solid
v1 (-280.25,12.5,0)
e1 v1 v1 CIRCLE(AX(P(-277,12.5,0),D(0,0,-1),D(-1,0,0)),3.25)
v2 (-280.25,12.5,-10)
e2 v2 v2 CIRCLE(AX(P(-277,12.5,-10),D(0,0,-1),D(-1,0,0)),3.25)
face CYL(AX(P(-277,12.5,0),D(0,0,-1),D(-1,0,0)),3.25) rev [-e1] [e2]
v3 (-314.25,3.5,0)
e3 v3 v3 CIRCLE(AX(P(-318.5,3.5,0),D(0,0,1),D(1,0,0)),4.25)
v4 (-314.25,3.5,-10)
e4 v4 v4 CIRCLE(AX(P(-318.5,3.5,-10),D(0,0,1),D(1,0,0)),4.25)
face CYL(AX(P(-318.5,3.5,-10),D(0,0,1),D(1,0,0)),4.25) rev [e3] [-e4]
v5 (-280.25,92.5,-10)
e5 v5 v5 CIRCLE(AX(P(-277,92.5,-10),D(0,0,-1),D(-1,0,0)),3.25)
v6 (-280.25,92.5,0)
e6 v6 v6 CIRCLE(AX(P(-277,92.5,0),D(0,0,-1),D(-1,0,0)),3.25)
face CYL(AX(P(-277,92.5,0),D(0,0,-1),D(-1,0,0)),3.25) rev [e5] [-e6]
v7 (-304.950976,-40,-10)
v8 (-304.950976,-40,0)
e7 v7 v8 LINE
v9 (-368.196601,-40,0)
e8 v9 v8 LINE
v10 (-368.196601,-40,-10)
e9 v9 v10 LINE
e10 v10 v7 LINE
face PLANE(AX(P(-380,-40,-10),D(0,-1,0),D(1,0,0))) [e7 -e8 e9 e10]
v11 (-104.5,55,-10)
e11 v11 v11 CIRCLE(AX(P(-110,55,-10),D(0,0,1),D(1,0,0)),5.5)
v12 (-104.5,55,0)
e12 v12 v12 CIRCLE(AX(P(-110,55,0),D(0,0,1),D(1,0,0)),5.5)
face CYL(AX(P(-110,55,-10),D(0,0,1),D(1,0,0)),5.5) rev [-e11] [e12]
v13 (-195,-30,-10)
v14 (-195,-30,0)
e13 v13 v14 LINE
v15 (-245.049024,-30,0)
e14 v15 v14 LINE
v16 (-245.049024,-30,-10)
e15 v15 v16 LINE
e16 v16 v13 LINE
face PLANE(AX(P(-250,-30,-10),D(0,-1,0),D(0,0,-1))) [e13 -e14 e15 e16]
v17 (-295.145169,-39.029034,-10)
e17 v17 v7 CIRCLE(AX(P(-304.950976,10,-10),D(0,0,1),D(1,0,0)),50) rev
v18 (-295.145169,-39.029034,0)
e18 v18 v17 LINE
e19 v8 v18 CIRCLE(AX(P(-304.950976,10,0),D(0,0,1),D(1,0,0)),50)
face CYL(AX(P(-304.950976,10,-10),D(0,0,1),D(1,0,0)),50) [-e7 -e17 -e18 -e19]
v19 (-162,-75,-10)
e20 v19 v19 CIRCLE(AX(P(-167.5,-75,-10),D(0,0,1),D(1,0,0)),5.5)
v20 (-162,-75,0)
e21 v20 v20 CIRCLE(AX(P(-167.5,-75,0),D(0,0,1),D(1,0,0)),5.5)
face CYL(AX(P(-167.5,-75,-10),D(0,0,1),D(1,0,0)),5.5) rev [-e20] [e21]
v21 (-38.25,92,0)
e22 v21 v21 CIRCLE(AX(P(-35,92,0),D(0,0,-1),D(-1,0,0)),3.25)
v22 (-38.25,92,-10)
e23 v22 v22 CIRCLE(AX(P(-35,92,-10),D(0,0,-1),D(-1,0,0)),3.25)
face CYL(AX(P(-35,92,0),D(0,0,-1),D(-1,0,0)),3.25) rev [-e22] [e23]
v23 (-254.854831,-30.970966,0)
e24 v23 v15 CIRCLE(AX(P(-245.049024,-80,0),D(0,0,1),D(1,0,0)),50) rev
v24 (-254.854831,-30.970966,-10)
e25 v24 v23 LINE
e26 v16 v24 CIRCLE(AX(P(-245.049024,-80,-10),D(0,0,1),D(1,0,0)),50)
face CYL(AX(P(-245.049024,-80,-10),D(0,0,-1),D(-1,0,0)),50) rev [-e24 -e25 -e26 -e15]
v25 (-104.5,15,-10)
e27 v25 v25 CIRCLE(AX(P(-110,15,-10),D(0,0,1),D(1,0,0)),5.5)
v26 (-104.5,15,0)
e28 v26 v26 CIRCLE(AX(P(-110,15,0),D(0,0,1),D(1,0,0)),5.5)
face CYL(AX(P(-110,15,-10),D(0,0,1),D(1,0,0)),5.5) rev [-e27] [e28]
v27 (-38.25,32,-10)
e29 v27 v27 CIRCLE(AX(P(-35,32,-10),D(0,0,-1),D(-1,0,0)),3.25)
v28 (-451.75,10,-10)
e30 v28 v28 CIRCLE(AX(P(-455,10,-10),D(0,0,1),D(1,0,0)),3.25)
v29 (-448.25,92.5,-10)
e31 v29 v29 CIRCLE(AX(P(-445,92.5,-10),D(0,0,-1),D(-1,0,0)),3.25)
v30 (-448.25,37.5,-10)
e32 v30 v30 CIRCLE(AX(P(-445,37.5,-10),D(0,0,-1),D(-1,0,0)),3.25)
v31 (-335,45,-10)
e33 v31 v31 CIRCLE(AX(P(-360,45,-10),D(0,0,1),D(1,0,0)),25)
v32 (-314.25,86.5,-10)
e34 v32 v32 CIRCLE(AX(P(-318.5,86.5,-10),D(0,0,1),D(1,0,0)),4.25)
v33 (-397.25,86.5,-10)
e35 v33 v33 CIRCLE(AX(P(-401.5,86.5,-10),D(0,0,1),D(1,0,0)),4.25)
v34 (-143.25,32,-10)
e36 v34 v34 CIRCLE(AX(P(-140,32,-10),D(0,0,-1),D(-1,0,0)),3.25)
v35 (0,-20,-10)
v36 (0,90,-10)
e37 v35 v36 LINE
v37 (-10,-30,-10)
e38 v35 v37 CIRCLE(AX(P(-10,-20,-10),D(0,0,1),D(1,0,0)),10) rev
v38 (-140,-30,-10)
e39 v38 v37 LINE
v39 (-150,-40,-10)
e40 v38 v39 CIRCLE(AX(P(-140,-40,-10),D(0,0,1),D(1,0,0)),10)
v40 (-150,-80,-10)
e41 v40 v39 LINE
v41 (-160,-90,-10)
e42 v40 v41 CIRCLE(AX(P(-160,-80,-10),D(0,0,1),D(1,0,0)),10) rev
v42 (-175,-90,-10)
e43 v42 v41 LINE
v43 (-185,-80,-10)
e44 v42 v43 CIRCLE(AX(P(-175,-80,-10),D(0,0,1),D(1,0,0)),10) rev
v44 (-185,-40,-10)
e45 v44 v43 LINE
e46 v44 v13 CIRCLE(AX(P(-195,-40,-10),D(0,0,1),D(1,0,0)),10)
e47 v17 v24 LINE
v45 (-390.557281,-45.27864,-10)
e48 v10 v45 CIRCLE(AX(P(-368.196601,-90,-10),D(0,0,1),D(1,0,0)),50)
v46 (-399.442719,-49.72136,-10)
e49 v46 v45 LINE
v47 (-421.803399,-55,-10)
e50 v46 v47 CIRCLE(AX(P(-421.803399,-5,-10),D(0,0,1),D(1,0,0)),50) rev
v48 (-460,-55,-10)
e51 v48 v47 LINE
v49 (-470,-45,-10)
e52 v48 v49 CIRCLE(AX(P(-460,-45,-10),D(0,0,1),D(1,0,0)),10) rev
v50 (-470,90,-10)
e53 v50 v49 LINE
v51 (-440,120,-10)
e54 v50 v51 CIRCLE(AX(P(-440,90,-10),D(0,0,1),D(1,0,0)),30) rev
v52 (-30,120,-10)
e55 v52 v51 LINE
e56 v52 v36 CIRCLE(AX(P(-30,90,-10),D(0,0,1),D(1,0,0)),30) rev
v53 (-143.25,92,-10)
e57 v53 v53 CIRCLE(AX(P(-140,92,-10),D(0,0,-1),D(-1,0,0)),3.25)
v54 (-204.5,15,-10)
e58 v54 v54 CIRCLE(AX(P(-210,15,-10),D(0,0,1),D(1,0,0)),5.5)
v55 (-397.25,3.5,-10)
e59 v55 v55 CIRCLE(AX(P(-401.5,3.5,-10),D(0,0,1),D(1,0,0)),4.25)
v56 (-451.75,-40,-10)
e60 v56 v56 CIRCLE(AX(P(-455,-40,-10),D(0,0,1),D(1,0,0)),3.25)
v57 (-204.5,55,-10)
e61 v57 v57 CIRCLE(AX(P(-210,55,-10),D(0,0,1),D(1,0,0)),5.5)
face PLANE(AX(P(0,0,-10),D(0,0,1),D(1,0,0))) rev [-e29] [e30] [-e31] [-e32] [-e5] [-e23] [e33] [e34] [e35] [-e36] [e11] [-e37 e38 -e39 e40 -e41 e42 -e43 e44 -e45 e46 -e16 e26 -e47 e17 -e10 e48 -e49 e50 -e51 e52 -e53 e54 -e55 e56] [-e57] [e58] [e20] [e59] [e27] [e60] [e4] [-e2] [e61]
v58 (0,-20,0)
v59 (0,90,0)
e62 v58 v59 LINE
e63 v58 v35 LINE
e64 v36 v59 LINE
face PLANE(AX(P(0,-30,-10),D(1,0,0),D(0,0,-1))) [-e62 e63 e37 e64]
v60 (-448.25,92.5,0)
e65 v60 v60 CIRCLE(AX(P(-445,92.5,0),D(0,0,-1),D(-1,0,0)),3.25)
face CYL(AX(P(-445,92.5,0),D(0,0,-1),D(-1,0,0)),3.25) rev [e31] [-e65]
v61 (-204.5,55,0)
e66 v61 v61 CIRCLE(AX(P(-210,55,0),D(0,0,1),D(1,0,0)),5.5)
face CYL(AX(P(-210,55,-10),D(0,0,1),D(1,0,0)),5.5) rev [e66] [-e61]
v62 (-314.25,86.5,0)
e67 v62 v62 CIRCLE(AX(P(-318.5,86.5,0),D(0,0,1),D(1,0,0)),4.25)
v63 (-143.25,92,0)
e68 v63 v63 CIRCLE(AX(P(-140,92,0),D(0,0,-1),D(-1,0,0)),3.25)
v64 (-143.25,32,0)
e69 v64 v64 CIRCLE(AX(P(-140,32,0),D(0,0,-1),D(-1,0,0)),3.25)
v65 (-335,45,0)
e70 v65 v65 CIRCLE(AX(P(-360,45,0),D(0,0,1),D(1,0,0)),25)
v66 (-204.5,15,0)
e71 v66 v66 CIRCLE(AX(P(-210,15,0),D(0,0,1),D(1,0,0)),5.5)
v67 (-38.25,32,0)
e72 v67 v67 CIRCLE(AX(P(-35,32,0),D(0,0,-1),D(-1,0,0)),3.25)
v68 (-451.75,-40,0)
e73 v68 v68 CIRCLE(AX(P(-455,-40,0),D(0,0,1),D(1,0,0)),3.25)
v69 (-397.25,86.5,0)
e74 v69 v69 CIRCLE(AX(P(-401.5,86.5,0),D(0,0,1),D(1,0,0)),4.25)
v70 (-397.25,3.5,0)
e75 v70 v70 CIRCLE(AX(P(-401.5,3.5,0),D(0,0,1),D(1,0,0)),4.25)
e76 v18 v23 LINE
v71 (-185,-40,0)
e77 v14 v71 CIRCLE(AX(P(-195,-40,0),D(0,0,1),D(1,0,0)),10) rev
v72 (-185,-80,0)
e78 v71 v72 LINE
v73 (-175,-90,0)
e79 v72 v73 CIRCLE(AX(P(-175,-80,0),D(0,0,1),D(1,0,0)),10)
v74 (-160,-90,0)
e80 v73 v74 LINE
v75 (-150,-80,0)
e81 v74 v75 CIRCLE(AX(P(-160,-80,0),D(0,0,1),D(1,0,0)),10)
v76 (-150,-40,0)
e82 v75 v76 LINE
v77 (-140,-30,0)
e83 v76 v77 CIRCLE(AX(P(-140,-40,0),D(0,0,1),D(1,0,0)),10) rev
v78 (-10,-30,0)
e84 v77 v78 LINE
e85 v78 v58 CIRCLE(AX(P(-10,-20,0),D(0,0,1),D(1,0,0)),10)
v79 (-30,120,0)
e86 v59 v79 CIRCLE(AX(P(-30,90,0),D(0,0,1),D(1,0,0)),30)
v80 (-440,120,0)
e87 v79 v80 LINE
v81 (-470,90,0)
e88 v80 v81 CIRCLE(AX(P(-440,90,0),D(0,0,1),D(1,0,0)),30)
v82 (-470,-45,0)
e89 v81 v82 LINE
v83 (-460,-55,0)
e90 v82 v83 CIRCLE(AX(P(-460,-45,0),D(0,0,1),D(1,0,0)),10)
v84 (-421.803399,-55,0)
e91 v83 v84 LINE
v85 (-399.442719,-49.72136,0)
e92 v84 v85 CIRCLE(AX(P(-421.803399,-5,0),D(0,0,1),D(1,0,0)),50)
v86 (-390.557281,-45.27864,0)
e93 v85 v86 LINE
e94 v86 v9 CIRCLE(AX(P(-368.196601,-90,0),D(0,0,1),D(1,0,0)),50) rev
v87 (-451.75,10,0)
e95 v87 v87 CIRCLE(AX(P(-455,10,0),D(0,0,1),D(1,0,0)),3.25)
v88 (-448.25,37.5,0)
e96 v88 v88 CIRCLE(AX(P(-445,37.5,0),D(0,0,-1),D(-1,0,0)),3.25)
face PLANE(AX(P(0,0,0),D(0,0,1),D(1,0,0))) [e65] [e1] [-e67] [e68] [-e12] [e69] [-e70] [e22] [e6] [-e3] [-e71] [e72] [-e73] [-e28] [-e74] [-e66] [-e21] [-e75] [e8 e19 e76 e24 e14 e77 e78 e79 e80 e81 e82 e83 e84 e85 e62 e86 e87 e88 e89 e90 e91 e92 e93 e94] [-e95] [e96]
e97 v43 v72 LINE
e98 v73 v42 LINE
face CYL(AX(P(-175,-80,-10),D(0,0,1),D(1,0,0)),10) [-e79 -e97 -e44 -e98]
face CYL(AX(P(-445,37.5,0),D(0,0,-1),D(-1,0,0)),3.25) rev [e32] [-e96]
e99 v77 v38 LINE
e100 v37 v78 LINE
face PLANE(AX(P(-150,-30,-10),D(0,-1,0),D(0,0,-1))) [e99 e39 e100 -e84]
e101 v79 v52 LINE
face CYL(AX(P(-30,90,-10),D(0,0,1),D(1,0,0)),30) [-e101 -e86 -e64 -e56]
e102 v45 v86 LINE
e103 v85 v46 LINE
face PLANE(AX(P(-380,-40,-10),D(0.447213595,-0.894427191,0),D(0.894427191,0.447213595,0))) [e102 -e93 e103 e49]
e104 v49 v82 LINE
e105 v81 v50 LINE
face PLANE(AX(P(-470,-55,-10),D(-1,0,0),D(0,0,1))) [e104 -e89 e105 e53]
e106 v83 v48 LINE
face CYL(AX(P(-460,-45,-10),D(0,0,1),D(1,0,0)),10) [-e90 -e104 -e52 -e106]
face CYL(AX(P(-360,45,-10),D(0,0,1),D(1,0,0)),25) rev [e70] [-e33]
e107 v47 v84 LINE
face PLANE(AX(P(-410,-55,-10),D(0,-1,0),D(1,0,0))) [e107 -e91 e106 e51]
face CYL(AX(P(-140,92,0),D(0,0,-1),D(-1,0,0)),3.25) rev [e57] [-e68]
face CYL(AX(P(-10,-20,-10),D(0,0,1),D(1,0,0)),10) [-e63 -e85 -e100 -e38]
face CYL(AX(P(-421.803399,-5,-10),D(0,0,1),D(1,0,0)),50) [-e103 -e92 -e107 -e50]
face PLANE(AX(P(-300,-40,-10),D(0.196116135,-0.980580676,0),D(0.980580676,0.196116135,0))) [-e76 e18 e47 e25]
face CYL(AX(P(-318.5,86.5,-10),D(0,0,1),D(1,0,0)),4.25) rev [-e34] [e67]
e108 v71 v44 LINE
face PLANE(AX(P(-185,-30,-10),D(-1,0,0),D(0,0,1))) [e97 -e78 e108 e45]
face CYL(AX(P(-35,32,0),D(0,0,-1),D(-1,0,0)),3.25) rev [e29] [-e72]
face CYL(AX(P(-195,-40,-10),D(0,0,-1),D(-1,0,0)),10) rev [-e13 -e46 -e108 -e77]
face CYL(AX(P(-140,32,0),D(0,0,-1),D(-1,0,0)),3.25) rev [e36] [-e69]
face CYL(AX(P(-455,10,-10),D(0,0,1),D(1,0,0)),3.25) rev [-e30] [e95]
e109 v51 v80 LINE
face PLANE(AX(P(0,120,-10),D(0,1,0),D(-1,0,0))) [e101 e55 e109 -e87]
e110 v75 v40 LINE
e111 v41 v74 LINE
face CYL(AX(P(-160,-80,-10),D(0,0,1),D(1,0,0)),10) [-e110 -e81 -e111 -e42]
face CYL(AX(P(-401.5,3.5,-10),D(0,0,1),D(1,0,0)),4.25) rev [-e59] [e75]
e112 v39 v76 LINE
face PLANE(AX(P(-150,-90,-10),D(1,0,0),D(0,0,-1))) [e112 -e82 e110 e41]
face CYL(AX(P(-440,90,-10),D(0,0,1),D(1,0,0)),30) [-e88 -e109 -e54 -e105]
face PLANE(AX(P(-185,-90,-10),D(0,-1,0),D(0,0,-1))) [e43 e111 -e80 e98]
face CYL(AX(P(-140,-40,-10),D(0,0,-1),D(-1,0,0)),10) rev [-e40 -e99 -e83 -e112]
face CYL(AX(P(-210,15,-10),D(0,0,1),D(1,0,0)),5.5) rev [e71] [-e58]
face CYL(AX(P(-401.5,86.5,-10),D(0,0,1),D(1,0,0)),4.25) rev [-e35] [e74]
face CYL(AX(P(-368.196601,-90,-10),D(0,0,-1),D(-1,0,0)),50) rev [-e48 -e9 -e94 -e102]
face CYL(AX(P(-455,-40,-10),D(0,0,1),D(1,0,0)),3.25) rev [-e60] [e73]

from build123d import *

# Parameters (mm, degrees)
TABAN_FLAN_1_DEPTH    = 10
IZIM2_R               = 25
IZIM2_R_2             = 4.25
IZIM2_R_3             = 5.5
IZIM2_R_4             = 3.25
KES_EKSTR_ZYON1_DEPTH = 10
RADYUS3_R             = 30
RADYUS4_R             = 10
RADYUS5_R             = 50
IZIM3_R               = 3.25
KES_EKSTR_ZYON2_DEPTH = 10
RADYUS7_R             = 10
RADYUS8_R             = 30


# Sheet-metal steps are written as plain solids
with BuildPart() as part:
    # Çizim1 → Taban-Flanş1 (new body)
    with BuildSketch(Plane.XY):
        Polygon((0, 120), (-470, 120), (-470, -55), (-410, -55), (-380, -40), (-300, -40), (-250, -30), (-185, -30), (-185, -90), (-150, -90), (-150, -30), (0, -30), (0, 0), align=None)
    extrude(amount=-TABAN_FLAN_1_DEPTH)

    # Çizim2 → Kes-Ekstrüzyon1 (cut)
    with BuildSketch(Plane.XY):
        with Locations((-360, 45)):
            Circle(IZIM2_R)
        with Locations((-401.5, 86.5)):
            Circle(IZIM2_R_2)
        with Locations((-318.5, 86.5)):
            Circle(IZIM2_R_2)
        with Locations((-401.5, 3.5)):
            Circle(IZIM2_R_2)
        with Locations((-318.5, 3.5)):
            Circle(IZIM2_R_2)
        with Locations((-110, 55)):
            Circle(IZIM2_R_3)
        with Locations((-210, 55)):
            Circle(IZIM2_R_3)
        with Locations((-210, 15)):
            Circle(IZIM2_R_3)
        with Locations((-110, 15)):
            Circle(IZIM2_R_3)
        with Locations((-167.5, -75)):
            Circle(IZIM2_R_3)
        with Locations((-455, 10)):
            Circle(IZIM2_R_4)
        with Locations((-455, -40)):
            Circle(IZIM2_R_4)
    extrude(amount=-KES_EKSTR_ZYON1_DEPTH, mode=Mode.SUBTRACT)

    # Radyus3
    radyus3_edges = [part.edges().sort_by_distance(p)[0] for p in [
        (0, 120, -5),
    ]]
    fillet(radyus3_edges, radius=RADYUS3_R)

    # Radyus4
    radyus4_edges = [part.edges().sort_by_distance(p)[0] for p in [
        (0, -30, -5),
        (-150, -30, -5),
        (-150, -90, -5),
        (-185, -90, -5),
        (-185, -30, -5),
    ]]
    fillet(radyus4_edges, radius=RADYUS4_R)

    # Radyus5
    radyus5_edges = [part.edges().sort_by_distance(p)[0] for p in [
        (-250, -30, -5),
        (-300, -40, -5),
        (-380, -40, -5),
        (-410, -55, -5),
    ]]
    fillet(radyus5_edges, radius=RADYUS5_R)

    # Çizim3 → Kes-Ekstrüzyon2 (cut)
    with BuildSketch(Plane(origin=(0, 0, -10), x_dir=(-1, 0, 0), z_dir=(0, 0, -1))):
        with Locations((277, 92.5)):
            Circle(IZIM3_R)
        with Locations((277, 12.5)):
            Circle(IZIM3_R)
        with Locations((445, 37.5)):
            Circle(IZIM3_R)
        with Locations((445, 92.5)):
            Circle(IZIM3_R)
        with Locations((140, 92)):
            Circle(IZIM3_R)
        with Locations((35, 92)):
            Circle(IZIM3_R)
        with Locations((35, 32)):
            Circle(IZIM3_R)
        with Locations((140, 32)):
            Circle(IZIM3_R)
    extrude(amount=-KES_EKSTR_ZYON2_DEPTH, mode=Mode.SUBTRACT)

    # Radyus7
    radyus7_edges = [part.edges().sort_by_distance(p)[0] for p in [
        (-470, -55, -5),
    ]]
    fillet(radyus7_edges, radius=RADYUS7_R)

    # Radyus8
    radyus8_edges = [part.edges().sort_by_distance(p)[0] for p in [
        (-470, 120, -5),
    ]]
    fillet(radyus8_edges, radius=RADYUS8_R)


solid = part.part
